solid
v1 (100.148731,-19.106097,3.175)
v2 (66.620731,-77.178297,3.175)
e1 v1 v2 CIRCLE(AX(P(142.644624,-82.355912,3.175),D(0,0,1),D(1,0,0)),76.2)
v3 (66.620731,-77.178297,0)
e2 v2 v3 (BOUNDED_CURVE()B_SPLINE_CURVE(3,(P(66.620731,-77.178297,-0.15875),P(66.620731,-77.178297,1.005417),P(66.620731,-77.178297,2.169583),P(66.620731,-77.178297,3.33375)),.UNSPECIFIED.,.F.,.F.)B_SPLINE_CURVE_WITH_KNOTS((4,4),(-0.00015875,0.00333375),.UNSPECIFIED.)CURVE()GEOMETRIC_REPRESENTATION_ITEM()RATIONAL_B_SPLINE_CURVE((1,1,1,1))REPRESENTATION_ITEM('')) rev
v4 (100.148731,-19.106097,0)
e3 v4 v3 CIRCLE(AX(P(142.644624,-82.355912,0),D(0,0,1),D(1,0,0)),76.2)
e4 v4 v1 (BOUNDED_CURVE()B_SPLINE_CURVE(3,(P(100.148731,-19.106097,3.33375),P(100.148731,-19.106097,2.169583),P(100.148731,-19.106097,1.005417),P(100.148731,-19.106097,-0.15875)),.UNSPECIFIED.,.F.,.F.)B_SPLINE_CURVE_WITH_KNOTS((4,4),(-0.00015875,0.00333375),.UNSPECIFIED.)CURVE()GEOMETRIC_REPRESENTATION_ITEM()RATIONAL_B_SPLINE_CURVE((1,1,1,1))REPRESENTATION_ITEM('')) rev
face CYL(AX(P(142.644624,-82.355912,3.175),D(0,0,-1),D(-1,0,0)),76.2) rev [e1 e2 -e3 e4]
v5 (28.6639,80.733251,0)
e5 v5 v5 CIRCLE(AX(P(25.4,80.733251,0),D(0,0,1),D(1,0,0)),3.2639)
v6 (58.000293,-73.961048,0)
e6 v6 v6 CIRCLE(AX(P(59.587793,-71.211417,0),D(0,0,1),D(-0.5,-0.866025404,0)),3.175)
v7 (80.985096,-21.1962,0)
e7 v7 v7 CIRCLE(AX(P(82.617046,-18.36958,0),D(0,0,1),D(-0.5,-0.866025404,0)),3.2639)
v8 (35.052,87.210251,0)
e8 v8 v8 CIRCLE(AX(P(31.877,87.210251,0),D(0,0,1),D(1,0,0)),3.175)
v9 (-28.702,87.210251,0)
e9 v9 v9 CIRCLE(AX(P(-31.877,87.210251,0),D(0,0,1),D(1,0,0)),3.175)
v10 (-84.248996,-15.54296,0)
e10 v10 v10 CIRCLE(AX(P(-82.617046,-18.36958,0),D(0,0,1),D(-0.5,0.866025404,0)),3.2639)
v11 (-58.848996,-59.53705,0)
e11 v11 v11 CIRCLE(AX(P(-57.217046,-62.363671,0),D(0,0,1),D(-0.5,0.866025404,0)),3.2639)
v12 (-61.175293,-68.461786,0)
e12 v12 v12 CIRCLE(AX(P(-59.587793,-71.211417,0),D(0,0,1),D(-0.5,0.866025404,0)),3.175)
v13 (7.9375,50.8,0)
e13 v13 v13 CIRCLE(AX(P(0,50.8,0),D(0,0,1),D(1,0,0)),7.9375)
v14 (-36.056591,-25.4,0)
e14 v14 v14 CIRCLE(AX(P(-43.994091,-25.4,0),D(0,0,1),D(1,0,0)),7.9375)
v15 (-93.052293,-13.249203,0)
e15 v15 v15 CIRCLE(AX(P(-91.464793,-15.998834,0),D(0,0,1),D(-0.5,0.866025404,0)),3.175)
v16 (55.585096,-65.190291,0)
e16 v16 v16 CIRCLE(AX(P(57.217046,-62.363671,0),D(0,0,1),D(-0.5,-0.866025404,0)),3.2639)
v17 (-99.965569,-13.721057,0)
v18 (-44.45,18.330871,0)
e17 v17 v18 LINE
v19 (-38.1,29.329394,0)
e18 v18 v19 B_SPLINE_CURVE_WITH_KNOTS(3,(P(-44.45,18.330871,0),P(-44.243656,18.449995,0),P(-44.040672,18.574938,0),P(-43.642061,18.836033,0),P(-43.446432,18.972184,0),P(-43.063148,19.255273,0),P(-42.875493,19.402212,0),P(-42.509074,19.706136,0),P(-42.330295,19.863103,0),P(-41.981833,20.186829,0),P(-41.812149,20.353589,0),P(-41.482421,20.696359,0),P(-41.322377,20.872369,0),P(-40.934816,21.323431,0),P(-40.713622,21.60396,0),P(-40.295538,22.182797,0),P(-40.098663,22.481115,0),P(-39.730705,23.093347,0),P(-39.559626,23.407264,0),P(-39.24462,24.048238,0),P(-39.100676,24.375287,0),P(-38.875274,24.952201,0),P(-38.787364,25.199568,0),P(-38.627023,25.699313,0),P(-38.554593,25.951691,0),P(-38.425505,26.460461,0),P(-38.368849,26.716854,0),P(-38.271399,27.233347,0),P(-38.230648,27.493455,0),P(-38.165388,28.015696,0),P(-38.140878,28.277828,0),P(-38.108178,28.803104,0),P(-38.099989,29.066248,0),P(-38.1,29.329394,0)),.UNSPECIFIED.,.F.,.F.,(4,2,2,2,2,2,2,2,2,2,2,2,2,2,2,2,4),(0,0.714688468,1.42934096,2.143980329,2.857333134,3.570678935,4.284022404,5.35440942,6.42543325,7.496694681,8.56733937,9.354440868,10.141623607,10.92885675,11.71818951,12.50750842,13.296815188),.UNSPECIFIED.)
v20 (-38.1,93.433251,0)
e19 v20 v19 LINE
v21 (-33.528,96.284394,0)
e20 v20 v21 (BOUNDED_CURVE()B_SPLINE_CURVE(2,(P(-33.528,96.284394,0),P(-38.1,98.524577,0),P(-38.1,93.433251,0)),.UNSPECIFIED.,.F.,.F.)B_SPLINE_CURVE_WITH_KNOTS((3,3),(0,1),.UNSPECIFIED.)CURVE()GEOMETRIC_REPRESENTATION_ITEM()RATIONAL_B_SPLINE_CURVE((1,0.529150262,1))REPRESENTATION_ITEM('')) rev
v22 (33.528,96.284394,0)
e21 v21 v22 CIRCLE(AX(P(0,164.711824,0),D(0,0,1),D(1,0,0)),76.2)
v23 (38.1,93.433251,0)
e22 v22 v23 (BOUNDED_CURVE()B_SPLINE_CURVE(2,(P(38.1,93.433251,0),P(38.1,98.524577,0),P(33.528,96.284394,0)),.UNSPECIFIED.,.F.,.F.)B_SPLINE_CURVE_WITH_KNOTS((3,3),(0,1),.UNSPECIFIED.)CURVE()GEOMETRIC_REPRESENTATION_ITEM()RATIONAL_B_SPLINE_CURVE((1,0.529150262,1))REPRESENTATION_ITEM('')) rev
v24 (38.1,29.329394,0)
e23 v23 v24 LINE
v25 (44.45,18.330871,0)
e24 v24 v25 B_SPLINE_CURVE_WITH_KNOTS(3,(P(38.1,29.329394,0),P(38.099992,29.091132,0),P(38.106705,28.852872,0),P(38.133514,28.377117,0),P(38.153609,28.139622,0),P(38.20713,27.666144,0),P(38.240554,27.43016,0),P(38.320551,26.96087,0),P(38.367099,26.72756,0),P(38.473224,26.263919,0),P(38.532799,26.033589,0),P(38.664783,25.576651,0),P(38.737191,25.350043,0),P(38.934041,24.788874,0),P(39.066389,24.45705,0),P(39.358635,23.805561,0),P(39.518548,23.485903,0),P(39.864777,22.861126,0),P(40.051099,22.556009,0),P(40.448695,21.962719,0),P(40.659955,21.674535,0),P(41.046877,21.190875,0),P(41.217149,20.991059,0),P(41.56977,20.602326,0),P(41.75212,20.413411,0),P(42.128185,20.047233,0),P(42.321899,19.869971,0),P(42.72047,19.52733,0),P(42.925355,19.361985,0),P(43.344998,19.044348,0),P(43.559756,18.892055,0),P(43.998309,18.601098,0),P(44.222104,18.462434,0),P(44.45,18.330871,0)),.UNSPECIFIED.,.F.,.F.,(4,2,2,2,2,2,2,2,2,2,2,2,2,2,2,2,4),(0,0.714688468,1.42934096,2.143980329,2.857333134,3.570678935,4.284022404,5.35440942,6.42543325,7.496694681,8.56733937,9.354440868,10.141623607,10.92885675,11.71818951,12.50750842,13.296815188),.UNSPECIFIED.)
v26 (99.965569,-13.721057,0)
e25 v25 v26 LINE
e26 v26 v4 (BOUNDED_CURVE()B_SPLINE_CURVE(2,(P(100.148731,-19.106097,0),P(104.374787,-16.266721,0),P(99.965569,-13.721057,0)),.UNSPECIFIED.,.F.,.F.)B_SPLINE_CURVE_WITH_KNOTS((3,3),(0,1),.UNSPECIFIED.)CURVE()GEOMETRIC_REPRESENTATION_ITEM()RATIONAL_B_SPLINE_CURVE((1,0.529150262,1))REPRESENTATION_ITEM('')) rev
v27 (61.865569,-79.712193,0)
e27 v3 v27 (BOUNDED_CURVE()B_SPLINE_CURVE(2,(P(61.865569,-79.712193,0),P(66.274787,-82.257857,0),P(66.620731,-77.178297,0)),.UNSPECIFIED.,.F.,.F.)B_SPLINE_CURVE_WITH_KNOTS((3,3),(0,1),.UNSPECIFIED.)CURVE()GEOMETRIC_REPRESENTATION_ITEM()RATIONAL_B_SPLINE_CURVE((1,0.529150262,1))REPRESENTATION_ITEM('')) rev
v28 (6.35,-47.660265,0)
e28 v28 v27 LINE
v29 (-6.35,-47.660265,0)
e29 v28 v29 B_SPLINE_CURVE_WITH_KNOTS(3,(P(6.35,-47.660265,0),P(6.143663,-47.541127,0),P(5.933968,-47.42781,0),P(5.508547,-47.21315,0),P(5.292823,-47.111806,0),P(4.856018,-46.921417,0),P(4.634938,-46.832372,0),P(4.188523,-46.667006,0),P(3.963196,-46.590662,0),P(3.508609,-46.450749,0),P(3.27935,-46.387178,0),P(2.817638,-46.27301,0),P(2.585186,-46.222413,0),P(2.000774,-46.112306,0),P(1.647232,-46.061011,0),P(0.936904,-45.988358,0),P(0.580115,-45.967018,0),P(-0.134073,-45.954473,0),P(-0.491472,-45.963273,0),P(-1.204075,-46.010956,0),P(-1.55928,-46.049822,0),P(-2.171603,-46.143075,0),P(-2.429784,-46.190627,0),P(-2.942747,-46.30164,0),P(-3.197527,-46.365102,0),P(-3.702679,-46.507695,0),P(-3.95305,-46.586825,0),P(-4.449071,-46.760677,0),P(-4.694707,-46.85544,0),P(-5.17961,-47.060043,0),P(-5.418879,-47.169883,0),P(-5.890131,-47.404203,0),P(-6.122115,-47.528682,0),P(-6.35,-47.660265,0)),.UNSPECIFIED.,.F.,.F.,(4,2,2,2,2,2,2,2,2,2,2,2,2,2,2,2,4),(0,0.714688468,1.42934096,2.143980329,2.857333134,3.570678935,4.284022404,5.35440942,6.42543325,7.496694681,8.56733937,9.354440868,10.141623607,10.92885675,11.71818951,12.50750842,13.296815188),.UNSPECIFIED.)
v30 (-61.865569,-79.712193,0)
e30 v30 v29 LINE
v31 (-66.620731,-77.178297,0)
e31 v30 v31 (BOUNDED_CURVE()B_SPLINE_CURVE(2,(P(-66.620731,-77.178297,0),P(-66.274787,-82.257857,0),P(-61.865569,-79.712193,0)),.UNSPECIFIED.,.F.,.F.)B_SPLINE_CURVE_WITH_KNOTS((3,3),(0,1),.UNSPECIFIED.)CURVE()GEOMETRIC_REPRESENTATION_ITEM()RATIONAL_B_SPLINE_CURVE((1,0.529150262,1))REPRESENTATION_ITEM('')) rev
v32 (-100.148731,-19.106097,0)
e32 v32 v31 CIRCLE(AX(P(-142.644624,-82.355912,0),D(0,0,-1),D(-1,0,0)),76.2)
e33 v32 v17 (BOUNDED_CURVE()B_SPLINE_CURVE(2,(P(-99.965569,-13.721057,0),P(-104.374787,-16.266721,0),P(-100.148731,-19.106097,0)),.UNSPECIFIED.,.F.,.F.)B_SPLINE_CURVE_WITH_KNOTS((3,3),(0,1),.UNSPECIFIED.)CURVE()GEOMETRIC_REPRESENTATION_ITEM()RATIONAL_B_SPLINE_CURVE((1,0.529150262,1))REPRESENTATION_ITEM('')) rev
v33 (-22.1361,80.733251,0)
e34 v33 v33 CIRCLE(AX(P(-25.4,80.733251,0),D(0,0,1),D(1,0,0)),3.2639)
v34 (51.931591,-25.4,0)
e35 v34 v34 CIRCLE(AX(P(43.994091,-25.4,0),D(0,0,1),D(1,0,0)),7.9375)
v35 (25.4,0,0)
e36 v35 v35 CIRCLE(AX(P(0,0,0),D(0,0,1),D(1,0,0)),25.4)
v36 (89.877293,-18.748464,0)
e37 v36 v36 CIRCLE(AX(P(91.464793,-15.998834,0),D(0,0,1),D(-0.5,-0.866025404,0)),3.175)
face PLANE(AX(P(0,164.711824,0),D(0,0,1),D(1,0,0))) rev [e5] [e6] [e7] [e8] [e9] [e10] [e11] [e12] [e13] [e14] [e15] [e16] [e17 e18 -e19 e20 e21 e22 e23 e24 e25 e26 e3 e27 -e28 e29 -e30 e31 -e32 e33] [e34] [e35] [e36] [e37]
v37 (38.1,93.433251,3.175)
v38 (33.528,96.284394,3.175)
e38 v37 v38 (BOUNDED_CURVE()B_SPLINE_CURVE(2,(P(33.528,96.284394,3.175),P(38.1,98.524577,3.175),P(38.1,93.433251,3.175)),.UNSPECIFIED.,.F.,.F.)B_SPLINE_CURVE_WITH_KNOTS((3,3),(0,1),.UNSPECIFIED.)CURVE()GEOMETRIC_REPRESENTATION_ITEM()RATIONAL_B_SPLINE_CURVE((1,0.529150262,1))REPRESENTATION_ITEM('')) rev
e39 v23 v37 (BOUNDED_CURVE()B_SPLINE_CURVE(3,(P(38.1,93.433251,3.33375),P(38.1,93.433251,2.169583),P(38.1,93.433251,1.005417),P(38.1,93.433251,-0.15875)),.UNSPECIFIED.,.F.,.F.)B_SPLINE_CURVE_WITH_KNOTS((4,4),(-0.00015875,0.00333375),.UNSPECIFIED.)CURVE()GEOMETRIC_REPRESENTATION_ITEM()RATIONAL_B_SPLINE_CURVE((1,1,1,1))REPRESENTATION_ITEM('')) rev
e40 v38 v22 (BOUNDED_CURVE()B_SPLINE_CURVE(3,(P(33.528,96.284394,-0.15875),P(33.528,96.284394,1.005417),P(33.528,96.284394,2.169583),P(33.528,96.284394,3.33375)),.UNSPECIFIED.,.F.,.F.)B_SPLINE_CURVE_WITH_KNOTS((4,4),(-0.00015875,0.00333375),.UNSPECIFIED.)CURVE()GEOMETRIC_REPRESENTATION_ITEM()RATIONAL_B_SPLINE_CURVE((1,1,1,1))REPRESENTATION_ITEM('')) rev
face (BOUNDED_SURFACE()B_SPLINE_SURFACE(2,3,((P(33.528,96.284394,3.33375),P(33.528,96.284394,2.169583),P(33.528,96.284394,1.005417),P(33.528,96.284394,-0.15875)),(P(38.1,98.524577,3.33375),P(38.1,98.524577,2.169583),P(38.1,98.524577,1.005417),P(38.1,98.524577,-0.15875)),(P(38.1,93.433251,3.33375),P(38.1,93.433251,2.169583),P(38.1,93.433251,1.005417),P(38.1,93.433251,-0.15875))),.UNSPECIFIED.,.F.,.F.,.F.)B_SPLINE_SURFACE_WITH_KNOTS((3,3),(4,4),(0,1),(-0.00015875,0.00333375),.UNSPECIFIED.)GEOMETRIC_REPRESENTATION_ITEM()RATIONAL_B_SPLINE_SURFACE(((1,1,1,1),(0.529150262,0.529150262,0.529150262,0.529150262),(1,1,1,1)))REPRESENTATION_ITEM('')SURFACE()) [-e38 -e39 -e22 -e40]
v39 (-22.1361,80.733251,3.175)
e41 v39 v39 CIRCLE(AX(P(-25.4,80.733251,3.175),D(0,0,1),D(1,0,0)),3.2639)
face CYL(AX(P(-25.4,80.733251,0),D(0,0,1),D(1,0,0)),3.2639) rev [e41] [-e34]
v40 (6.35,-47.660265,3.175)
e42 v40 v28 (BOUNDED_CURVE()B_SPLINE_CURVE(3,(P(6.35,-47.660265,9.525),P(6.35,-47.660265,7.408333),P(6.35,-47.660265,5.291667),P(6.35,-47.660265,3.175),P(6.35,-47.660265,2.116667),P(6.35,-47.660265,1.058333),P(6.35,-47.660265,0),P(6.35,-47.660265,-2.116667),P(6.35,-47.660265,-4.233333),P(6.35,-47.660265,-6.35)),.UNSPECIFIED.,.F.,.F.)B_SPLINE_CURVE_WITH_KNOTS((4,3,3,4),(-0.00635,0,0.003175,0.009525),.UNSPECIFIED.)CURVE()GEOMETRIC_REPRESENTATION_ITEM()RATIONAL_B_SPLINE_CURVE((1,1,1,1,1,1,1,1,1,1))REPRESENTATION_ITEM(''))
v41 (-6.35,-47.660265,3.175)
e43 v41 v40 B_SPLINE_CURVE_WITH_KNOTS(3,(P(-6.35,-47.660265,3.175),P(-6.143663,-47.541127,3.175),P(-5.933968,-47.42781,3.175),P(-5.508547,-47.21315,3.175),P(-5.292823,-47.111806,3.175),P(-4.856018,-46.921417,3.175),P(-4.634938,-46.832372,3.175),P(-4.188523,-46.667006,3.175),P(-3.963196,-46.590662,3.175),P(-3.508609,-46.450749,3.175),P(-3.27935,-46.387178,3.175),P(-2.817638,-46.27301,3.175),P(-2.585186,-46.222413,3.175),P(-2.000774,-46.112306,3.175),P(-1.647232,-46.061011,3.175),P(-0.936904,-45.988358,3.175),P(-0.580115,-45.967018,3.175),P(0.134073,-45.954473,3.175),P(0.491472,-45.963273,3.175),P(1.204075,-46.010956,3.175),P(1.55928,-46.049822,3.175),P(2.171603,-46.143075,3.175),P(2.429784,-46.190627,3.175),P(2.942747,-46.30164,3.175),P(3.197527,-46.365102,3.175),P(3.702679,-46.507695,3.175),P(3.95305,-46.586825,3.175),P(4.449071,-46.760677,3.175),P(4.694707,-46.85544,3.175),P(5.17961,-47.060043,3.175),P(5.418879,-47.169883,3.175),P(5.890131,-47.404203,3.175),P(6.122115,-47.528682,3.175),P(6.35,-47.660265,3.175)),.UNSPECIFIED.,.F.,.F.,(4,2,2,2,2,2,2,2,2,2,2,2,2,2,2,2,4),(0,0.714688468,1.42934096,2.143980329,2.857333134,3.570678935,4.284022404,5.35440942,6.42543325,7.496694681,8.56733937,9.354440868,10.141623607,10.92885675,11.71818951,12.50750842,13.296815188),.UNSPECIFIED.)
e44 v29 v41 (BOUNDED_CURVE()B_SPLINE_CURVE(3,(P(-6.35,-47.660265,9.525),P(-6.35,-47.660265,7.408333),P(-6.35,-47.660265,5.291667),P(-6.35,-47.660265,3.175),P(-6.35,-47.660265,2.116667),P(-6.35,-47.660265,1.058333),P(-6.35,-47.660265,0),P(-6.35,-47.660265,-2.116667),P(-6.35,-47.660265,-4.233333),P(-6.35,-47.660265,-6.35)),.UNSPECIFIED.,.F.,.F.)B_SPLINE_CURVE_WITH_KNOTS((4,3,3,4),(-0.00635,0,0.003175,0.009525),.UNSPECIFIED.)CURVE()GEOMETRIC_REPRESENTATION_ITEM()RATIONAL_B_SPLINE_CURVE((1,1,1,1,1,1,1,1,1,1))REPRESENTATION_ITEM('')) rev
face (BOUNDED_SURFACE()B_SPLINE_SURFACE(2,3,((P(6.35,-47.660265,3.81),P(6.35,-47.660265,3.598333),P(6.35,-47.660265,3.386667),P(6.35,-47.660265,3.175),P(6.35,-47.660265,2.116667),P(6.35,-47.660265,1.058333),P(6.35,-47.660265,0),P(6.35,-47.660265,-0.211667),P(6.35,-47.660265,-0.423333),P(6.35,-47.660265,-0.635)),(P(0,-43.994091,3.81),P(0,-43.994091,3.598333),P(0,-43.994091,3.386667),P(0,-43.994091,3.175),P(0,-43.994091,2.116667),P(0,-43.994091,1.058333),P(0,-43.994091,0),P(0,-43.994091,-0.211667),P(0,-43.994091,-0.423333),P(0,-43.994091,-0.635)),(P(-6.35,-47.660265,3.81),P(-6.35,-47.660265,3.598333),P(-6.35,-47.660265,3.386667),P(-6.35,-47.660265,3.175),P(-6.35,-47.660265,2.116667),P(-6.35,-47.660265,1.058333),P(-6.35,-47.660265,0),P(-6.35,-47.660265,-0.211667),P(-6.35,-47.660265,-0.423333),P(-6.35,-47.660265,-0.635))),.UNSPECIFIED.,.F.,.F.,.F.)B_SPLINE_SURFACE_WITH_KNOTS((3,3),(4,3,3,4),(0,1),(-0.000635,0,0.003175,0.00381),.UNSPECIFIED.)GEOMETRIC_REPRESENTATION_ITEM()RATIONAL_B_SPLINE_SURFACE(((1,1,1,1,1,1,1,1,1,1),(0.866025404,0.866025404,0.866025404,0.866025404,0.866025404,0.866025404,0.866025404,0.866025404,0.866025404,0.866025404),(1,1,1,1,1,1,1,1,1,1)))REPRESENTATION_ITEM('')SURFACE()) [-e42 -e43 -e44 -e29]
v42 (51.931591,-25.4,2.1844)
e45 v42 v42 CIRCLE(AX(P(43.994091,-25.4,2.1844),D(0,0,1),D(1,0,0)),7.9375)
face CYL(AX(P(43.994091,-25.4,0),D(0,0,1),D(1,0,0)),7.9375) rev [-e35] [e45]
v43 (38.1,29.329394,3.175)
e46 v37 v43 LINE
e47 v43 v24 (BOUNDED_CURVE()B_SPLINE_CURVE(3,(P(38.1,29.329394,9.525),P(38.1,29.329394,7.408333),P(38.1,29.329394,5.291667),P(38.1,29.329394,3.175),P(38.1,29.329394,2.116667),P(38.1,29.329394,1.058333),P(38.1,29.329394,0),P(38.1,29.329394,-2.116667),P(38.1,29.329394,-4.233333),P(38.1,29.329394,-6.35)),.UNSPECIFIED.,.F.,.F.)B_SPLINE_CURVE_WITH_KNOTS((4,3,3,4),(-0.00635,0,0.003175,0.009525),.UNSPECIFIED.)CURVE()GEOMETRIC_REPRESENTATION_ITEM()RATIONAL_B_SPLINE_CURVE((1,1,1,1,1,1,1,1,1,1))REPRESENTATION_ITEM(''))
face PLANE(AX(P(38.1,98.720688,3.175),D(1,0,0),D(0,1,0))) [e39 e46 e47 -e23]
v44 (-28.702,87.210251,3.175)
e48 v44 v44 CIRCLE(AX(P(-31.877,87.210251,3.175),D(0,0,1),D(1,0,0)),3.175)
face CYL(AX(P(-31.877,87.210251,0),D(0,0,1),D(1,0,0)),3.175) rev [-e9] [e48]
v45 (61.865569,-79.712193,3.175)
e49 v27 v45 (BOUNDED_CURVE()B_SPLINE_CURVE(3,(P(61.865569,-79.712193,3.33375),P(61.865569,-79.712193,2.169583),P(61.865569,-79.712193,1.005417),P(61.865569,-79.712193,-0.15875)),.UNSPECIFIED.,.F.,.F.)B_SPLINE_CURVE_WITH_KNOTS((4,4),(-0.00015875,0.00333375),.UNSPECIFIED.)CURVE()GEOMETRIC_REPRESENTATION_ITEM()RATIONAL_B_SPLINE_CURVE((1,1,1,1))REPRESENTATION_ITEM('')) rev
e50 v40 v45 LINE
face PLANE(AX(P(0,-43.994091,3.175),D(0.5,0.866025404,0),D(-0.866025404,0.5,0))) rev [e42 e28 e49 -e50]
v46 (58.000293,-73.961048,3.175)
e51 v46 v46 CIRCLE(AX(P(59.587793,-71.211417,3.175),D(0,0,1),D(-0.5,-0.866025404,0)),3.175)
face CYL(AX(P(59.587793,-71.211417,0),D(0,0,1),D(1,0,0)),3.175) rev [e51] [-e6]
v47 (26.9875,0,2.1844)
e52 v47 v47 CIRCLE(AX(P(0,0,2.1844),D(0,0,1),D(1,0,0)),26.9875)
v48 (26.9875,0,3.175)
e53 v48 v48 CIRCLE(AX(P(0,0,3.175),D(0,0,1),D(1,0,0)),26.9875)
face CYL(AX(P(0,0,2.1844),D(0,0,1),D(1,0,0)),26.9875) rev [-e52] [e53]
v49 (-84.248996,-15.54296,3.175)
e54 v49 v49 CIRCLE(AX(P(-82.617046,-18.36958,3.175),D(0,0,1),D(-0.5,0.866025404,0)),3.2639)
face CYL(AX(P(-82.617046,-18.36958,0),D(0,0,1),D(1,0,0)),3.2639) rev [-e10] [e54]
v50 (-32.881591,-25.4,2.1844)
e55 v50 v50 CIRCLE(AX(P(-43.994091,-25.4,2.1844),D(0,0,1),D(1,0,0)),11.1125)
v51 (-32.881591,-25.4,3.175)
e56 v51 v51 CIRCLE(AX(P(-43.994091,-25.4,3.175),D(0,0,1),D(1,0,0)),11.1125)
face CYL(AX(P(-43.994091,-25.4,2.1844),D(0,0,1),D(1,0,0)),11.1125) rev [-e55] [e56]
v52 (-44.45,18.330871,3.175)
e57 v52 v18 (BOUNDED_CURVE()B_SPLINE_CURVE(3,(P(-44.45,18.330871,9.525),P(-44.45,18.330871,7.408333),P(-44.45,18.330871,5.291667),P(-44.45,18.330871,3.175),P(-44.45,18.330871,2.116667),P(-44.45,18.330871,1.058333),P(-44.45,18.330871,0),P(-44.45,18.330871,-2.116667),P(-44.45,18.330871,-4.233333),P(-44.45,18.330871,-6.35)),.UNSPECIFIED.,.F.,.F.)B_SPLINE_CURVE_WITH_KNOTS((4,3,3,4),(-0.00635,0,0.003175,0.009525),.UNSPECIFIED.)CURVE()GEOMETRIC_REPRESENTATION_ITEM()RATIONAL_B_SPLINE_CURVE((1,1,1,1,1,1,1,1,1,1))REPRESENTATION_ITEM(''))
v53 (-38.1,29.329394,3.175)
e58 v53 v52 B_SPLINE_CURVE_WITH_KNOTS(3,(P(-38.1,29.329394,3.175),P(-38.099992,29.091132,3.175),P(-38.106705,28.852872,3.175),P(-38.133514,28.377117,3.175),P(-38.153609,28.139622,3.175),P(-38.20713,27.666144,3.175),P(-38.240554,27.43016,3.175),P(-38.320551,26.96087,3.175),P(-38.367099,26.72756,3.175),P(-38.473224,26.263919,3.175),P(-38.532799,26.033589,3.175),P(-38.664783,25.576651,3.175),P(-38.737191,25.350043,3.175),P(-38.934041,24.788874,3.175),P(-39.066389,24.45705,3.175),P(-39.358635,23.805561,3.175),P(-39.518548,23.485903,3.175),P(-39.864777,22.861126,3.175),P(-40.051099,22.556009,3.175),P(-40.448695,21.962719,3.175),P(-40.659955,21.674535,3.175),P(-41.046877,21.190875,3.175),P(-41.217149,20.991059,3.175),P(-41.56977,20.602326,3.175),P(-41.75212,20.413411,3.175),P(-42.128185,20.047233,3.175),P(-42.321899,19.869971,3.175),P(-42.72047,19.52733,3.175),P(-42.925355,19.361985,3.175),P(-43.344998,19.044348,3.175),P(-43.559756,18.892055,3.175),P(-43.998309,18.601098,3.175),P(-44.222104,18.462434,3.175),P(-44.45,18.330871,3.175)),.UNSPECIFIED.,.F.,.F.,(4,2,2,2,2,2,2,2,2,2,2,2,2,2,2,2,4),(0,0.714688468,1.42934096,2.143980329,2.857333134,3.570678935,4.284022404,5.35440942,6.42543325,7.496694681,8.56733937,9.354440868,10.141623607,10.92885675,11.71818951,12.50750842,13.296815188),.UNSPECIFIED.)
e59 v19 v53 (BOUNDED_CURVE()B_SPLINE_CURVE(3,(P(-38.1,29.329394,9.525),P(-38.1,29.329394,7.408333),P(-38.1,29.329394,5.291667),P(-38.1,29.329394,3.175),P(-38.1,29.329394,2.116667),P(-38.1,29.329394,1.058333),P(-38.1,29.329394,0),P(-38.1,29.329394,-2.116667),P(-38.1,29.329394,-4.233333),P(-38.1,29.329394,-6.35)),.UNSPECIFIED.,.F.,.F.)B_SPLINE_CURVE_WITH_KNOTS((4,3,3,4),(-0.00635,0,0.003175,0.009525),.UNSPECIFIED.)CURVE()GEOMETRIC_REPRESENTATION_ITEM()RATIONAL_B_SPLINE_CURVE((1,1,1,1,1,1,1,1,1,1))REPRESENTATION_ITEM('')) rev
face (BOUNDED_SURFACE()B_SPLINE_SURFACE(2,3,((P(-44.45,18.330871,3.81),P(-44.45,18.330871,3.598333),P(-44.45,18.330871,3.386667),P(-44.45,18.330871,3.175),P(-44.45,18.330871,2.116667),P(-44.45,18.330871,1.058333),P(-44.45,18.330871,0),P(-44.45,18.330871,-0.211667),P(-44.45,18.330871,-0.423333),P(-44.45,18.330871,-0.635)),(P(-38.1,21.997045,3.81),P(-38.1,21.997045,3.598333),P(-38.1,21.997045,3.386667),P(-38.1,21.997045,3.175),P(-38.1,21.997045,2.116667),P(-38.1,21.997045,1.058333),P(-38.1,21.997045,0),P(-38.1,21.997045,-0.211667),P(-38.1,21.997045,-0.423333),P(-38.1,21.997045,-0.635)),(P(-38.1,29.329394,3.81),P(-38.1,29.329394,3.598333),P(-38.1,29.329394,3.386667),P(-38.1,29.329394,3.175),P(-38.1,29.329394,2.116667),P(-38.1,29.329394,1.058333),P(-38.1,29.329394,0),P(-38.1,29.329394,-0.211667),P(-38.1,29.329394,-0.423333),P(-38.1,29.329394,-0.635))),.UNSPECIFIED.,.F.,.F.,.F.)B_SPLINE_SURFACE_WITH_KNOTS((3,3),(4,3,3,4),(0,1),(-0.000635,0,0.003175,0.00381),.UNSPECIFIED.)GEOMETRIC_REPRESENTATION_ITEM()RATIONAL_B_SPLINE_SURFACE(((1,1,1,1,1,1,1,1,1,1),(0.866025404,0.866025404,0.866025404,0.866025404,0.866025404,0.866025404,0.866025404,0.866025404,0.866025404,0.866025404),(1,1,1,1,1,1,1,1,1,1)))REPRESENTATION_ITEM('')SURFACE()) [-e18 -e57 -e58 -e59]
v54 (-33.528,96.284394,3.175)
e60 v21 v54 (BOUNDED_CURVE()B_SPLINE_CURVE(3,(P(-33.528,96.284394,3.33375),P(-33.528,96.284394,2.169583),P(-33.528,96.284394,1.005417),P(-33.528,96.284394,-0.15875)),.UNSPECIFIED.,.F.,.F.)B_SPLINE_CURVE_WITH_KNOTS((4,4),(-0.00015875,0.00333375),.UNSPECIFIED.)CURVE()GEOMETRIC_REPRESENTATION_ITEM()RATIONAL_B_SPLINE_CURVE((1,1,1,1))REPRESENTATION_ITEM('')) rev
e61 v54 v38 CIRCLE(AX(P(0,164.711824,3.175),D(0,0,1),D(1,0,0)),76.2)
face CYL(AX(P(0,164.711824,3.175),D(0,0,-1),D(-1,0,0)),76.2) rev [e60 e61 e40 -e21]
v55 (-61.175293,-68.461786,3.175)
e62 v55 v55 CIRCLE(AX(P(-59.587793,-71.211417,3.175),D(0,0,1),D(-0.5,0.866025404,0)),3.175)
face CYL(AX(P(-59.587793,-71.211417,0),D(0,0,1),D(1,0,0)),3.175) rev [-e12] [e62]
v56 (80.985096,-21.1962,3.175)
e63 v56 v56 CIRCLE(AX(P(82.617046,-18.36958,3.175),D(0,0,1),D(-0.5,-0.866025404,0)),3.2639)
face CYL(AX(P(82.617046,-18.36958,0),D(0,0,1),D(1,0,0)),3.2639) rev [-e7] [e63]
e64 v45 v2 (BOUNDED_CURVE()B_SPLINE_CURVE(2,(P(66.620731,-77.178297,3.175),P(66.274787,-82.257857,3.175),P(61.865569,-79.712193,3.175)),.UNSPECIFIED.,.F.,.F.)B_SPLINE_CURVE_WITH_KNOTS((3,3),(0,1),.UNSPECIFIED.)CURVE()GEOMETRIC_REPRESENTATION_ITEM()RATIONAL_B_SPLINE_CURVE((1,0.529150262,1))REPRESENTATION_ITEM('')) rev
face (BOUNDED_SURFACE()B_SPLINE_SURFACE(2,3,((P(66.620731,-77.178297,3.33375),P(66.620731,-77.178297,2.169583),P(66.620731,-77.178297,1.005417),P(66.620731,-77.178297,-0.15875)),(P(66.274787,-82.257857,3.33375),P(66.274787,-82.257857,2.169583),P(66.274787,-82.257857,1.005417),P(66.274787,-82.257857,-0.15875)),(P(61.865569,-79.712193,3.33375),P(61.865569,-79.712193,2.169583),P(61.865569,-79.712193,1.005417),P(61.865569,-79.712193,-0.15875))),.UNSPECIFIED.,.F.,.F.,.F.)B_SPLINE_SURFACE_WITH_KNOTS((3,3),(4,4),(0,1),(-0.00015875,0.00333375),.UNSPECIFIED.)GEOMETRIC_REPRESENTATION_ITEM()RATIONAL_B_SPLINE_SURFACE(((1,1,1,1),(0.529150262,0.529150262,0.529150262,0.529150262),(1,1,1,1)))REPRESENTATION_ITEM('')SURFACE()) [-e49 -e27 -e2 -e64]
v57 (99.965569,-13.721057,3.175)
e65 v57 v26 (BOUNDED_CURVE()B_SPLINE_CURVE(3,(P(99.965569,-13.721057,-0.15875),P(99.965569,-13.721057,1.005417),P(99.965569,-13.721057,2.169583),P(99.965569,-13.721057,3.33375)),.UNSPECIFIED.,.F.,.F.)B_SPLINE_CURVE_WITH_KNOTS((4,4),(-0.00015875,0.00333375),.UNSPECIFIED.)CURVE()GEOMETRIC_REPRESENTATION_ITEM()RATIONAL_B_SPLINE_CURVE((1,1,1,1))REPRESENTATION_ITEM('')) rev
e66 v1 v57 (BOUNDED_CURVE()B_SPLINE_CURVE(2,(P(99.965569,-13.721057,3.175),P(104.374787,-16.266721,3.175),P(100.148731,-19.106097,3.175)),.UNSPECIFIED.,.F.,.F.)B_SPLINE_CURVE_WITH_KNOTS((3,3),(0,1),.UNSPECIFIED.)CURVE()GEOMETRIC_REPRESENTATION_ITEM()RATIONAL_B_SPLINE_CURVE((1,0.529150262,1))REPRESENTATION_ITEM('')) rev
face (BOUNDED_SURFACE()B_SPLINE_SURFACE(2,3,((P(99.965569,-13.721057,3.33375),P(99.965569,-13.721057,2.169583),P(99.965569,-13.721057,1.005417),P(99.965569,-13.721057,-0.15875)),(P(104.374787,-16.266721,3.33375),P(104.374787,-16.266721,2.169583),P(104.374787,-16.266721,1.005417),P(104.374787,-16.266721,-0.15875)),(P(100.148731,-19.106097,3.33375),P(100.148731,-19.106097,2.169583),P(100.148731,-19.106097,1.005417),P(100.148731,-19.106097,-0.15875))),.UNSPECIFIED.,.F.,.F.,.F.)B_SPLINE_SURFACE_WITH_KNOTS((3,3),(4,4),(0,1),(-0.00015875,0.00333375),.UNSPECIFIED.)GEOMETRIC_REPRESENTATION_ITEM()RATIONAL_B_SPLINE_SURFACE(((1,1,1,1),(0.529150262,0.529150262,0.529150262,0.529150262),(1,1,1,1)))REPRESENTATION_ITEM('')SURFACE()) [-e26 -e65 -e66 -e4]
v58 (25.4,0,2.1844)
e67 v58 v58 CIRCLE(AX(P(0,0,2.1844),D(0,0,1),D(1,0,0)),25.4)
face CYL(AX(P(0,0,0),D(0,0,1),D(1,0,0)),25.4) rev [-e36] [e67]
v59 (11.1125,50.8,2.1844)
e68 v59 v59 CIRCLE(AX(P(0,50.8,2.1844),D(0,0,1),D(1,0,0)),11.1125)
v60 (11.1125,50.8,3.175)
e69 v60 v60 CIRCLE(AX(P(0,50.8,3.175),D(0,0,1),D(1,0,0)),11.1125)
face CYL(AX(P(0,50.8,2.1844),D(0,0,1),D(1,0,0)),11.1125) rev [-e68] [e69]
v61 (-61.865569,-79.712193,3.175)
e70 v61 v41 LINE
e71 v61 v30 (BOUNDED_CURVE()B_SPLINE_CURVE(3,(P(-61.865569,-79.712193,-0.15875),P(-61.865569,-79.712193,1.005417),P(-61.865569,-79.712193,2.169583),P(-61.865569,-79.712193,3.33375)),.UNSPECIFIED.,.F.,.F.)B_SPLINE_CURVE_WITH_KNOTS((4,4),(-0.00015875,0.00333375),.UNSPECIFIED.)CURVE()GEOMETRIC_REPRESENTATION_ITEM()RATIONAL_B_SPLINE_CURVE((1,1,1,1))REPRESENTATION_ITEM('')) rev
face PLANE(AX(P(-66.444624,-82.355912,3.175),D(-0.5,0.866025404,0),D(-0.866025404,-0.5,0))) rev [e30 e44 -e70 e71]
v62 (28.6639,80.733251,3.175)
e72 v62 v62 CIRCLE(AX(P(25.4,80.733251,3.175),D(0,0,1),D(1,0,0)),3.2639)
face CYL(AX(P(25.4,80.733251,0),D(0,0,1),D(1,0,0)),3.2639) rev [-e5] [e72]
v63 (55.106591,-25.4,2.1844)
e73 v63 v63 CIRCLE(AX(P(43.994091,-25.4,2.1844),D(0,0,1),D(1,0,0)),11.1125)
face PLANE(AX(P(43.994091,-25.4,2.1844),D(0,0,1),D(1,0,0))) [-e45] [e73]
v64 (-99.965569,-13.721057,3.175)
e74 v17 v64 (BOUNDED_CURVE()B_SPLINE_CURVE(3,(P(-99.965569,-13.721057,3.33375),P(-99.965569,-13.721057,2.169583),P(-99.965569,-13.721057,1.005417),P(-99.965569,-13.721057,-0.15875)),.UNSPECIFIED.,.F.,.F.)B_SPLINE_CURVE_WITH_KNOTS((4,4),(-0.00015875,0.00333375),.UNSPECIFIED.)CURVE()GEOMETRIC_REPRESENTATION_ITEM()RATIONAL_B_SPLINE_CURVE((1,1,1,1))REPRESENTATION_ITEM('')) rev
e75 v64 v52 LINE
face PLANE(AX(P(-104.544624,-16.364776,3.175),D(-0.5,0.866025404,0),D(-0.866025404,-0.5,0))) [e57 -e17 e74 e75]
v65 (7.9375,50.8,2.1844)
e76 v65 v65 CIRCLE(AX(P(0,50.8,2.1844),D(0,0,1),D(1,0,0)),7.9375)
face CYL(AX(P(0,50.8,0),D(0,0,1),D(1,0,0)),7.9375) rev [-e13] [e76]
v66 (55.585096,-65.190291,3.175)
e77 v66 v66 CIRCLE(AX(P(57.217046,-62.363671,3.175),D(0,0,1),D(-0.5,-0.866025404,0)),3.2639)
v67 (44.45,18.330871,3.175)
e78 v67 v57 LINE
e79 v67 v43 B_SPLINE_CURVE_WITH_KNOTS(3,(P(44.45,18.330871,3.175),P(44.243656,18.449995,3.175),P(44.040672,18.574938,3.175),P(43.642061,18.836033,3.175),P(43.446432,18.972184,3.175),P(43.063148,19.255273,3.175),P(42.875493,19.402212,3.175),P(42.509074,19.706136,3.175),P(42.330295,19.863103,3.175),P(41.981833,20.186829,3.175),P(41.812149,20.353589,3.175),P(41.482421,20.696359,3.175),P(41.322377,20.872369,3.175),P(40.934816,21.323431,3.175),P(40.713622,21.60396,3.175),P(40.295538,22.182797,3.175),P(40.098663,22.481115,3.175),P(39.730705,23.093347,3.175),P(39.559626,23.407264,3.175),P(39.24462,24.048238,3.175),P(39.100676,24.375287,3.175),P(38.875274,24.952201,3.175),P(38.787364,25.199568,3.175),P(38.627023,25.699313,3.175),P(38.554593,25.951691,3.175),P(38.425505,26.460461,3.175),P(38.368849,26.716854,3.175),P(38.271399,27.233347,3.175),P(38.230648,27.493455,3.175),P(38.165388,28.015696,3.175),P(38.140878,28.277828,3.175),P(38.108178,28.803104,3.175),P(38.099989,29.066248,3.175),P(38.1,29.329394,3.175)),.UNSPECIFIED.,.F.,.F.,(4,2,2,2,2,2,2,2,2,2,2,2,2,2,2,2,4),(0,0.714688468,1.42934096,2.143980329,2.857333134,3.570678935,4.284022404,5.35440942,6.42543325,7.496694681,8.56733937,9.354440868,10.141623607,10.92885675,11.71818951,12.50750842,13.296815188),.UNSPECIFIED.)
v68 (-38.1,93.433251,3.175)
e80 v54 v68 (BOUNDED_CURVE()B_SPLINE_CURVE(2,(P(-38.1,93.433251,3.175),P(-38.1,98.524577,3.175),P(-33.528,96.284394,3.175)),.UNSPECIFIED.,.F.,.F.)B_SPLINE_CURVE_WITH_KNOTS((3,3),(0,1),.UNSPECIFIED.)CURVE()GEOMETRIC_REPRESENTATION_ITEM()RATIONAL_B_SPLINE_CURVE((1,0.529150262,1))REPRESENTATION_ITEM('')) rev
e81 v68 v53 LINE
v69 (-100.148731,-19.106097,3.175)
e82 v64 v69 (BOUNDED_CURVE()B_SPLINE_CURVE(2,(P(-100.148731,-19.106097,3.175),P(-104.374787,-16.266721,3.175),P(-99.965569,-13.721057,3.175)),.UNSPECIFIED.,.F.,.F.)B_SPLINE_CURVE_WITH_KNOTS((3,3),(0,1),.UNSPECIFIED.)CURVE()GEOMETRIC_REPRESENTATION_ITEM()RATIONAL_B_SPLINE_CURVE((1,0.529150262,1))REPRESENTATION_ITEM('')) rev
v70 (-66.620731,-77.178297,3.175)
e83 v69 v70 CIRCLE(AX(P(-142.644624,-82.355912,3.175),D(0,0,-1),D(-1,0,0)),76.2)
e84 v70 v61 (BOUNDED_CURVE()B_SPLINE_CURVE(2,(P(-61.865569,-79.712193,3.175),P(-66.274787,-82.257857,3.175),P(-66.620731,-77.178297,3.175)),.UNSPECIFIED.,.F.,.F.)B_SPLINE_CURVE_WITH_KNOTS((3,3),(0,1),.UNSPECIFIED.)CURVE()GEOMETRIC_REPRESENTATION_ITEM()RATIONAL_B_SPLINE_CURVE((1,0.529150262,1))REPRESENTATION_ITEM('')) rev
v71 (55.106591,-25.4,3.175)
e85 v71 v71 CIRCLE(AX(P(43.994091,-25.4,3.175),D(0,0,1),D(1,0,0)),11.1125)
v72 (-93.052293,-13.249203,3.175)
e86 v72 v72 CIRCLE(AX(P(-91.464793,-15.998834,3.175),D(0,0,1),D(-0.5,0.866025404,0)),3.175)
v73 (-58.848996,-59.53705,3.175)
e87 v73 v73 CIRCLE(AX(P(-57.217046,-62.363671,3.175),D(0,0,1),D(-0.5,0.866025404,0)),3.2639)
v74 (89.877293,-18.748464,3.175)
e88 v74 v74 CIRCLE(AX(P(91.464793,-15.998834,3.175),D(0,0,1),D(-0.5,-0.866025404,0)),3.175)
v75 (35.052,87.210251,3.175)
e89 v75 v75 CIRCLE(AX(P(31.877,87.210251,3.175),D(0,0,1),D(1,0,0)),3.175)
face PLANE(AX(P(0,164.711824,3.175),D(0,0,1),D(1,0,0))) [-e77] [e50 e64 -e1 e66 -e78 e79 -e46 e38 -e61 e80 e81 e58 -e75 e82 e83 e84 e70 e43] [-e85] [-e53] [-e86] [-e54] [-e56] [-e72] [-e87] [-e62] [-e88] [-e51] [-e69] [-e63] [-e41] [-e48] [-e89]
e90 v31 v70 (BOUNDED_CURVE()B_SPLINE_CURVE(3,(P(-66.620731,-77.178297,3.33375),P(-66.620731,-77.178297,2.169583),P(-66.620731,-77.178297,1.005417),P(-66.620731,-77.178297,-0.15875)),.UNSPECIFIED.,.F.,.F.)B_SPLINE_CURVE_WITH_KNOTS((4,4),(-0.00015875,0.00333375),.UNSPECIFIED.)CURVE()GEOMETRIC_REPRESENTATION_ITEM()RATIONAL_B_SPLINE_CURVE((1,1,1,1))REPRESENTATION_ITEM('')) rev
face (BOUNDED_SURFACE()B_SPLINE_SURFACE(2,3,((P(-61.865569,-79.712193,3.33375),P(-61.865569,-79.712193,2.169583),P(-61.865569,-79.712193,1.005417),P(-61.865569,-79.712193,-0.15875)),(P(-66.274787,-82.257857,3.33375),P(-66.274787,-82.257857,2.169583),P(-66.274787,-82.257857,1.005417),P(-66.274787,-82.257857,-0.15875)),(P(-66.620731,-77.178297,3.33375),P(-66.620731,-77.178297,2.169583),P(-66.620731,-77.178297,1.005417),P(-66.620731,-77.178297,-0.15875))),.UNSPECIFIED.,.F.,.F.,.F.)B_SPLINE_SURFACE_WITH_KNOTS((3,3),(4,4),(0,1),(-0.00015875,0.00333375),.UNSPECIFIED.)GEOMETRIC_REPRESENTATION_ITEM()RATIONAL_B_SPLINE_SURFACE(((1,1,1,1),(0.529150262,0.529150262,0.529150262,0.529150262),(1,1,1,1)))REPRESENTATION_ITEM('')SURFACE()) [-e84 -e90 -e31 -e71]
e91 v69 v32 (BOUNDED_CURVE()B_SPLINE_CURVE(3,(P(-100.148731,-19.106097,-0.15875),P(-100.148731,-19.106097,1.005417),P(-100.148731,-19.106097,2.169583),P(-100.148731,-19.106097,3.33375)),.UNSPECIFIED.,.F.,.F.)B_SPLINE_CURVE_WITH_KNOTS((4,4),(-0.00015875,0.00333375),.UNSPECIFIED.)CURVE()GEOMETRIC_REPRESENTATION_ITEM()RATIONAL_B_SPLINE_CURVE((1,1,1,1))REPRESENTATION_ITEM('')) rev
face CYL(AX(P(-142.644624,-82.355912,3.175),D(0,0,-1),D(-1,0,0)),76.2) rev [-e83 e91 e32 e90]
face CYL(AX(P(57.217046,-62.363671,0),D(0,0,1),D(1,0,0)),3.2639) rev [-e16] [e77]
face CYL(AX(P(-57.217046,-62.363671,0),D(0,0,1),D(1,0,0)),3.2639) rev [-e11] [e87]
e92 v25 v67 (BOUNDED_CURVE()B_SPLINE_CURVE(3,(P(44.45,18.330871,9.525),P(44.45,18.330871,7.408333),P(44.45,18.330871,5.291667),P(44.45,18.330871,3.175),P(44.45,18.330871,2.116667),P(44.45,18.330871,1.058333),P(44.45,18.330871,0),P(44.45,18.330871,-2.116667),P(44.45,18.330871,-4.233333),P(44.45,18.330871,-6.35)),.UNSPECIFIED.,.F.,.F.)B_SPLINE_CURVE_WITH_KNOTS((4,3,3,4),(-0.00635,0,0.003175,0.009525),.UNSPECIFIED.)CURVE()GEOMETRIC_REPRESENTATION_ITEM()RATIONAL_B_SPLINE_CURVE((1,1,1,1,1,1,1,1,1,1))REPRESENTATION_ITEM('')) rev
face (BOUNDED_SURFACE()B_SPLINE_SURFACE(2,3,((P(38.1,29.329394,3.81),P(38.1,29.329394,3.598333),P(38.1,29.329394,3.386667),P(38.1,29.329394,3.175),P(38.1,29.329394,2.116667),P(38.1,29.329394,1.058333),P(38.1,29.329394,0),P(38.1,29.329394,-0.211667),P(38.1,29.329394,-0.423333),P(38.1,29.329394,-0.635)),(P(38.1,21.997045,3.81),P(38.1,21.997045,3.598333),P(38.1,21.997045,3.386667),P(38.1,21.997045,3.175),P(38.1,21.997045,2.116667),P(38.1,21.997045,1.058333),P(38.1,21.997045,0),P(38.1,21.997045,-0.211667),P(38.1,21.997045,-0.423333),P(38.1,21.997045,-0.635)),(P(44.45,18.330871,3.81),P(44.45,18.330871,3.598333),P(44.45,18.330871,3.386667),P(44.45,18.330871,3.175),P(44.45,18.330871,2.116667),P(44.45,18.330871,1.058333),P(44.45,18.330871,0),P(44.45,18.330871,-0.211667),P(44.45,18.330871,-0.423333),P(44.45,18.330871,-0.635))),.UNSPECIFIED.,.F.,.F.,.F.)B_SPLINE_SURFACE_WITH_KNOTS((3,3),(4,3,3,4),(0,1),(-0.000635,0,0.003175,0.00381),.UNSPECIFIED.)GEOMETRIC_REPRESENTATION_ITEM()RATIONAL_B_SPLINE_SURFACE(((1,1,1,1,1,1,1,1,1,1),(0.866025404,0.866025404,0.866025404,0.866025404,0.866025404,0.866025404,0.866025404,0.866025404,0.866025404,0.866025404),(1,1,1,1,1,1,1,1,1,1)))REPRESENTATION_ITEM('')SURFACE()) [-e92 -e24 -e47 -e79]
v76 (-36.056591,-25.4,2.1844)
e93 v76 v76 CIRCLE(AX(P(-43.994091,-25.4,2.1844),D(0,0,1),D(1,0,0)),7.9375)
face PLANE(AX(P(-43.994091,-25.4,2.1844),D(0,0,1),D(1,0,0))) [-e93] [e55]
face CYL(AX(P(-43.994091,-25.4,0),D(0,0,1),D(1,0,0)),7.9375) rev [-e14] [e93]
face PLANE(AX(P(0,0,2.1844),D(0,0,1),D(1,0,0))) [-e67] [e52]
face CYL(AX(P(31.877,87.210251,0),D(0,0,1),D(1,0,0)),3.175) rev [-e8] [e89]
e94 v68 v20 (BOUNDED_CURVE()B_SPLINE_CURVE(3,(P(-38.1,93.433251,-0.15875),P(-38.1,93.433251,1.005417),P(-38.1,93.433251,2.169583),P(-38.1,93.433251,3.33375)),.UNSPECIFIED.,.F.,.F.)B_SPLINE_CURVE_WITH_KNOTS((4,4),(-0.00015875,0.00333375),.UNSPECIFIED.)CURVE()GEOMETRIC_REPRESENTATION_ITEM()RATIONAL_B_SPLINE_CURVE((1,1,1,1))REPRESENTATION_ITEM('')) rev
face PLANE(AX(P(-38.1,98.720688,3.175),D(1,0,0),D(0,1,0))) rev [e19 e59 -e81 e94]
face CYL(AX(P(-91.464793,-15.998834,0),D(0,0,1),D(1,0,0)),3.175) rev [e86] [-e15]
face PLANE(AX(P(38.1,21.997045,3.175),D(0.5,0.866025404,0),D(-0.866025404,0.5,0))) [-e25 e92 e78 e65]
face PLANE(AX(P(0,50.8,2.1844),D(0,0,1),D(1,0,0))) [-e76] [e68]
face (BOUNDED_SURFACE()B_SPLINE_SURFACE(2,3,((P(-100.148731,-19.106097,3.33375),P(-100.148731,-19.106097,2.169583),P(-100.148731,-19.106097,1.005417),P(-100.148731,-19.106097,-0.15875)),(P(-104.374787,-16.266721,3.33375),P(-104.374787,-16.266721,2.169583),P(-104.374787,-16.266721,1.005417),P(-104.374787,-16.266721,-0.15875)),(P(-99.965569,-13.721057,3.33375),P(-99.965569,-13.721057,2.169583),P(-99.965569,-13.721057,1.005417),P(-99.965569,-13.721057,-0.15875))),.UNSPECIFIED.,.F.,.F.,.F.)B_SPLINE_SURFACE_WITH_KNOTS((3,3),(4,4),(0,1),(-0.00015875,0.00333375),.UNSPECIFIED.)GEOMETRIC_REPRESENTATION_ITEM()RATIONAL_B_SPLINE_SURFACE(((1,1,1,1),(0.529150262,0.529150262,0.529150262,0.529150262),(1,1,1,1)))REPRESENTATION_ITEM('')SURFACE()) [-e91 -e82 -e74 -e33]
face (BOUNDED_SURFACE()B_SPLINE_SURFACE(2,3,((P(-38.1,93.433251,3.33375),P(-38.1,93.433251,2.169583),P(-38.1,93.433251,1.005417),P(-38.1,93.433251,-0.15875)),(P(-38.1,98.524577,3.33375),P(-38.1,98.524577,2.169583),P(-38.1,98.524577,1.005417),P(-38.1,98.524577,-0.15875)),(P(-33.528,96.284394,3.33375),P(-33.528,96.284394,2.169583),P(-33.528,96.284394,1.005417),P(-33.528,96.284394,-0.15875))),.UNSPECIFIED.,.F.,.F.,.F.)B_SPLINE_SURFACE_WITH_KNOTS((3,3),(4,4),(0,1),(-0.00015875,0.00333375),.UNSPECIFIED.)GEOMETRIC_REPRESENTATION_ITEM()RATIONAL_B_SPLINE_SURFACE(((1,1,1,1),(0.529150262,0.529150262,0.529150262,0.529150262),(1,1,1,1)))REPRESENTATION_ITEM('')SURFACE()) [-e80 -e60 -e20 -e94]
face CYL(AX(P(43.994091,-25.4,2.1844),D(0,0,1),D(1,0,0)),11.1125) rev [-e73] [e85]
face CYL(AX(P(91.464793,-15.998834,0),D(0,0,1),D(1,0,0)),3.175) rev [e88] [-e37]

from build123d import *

# Parameters (mm, degrees)
BOSS_EXTRUDE1_DEPTH = 3.175
VARFILLET1_R        = 3.175
VARFILLET2_R        = 12.7
SKETCH5_R           = 25.4
CUT_EXTRUDE1_DEPTH  = 3.175
SKETCH5_11_R        = 26.9875
SKETCH5_11_R_2      = 25.4
CUT_EXTRUDE2_DEPTH  = 0.9906
SKETCH24_R          = 11.1125
SKETCH24_R_2        = 7.9375
CUT_EXTRUDE5_DEPTH  = 0.9906
SKETCH24_2_R        = 7.9375
CUT_EXTRUDE6_DEPTH  = 3.175
SKETCH32_R          = 3.175
SKETCH32_R_2        = 3.2639
CUT_EXTRUDE10_DEPTH = 3.175
CIRPATTERN1_COUNT   = 3


with BuildPart() as part:
    # Basic Outline → Boss-Extrude1 (new body)
    with BuildSketch(Plane.XY):
        with BuildLine():
            Line((-38.1, 98.7206881), (-38.1, 21.997045256))
            Line((-38.1, 21.997045256), (-104.544623774, -16.364776166))
            ThreePointArc((-104.544623774, -16.364776166), (-76.653488005, -44.255911934), (-66.444623774, -82.355911934))
            Line((-66.444623774, -82.355911934), (0, -43.994090512))
            Line((0, -43.994090512), (66.444623774, -82.355911934))
            ThreePointArc((66.444623774, -82.355911934), (76.653488005, -44.255911934), (104.544623774, -16.364776166))
            Line((104.544623774, -16.364776166), (38.1, 21.997045256))
            Line((38.1, 21.997045256), (38.1, 98.7206881))
            ThreePointArc((38.1, 98.7206881), (0, 88.511823868), (-38.1, 98.7206881))
        make_face()
    extrude(amount=BOSS_EXTRUDE1_DEPTH)

    # VarFillet1
    varfillet1_edges = [part.edges().sort_by_distance(p)[0] for p in [
        (-38.1, 98.7206881, 1.5875),
        (38.1, 98.7206881, 1.5875),
        (-104.544623774, -16.364776166, 1.5875),
        (-66.444623774, -82.355911934, 1.5875),
        (66.444623774, -82.355911934, 1.5875),
        (104.544623774, -16.364776166, 1.5875),
    ]]
    fillet(varfillet1_edges, radius=VARFILLET1_R)

    # VarFillet2
    varfillet2_edges = [part.edges().sort_by_distance(p)[0] for p in [
        (0, -43.994090512, 1.5875),
        (-38.1, 21.997045256, 1.5875),
        (38.1, 21.997045256, 1.5875),
    ]]
    fillet(varfillet2_edges, radius=VARFILLET2_R)

    # Sketch5 → Cut-Extrude1 (cut)
    with BuildSketch(Plane.XY.offset(3.175)):
        Circle(SKETCH5_R)
    extrude(amount=-CUT_EXTRUDE1_DEPTH, mode=Mode.SUBTRACT)

    # Sketch5<11> → Cut-Extrude2 (cut)
    with BuildSketch(Plane.XY.offset(3.175)):
        Circle(SKETCH5_11_R)
        Circle(SKETCH5_11_R_2, mode=Mode.SUBTRACT)
    extrude(amount=-CUT_EXTRUDE2_DEPTH, mode=Mode.SUBTRACT)

    # Sketch24 → Cut-Extrude5 (cut)
    # profile 1 of 3: a face of its own
    with BuildSketch(Plane.XY.offset(3.175)):
        with Locations((0, 50.8)):
            Circle(SKETCH24_R)
        with Locations((0, 50.8)):
            Circle(SKETCH24_R_2, mode=Mode.SUBTRACT)
    # profile 2 of 3: a face of its own
    with BuildSketch(Plane.XY.offset(3.175)):
        with Locations((-43.994090512, -25.4)):
            Circle(SKETCH24_R)
        with Locations((-43.994090512, -25.4)):
            Circle(SKETCH24_R_2, mode=Mode.SUBTRACT)
    # profile 3 of 3: a face of its own
    with BuildSketch(Plane.XY.offset(3.175)):
        with Locations((43.994090512, -25.4)):
            Circle(SKETCH24_R)
        with Locations((43.994090512, -25.4)):
            Circle(SKETCH24_R_2, mode=Mode.SUBTRACT)
    extrude(amount=-CUT_EXTRUDE5_DEPTH, mode=Mode.SUBTRACT)

    # Sketch24<2> → Cut-Extrude6 (cut)
    with BuildSketch(Plane.XY.offset(3.175)):
        with Locations((0, 50.8)):
            Circle(SKETCH24_2_R)
        with Locations((-43.994090512, -25.4)):
            Circle(SKETCH24_2_R)
        with Locations((43.994090512, -25.4)):
            Circle(SKETCH24_2_R)
    extrude(amount=-CUT_EXTRUDE6_DEPTH, mode=Mode.SUBTRACT)

    # Sketch32 → Cut-Extrude10 (cut)
    with BuildSketch(Plane.XY.offset(3.175)):
        with Locations((-31.877, 87.21025065)):
            Circle(SKETCH32_R)
        with Locations((-25.4, 80.73325065)):
            Circle(SKETCH32_R_2)
        with Locations((31.877, 87.21025065)):
            Circle(SKETCH32_R)
        with Locations((25.4, 80.73325065)):
            Circle(SKETCH32_R_2)
    cut_extrude10 = extrude(amount=-CUT_EXTRUDE10_DEPTH, mode=Mode.SUBTRACT)

    # CirPattern1: Cut-Extrude10 ×3 about axis
    cirpattern1_axis = Axis((0, 0, 0), (0, 0, 1))
    for i in range(1, CIRPATTERN1_COUNT):
        add(cut_extrude10.rotate(cirpattern1_axis, i * 360 / CIRPATTERN1_COUNT), mode=Mode.SUBTRACT)


solid = part.part
